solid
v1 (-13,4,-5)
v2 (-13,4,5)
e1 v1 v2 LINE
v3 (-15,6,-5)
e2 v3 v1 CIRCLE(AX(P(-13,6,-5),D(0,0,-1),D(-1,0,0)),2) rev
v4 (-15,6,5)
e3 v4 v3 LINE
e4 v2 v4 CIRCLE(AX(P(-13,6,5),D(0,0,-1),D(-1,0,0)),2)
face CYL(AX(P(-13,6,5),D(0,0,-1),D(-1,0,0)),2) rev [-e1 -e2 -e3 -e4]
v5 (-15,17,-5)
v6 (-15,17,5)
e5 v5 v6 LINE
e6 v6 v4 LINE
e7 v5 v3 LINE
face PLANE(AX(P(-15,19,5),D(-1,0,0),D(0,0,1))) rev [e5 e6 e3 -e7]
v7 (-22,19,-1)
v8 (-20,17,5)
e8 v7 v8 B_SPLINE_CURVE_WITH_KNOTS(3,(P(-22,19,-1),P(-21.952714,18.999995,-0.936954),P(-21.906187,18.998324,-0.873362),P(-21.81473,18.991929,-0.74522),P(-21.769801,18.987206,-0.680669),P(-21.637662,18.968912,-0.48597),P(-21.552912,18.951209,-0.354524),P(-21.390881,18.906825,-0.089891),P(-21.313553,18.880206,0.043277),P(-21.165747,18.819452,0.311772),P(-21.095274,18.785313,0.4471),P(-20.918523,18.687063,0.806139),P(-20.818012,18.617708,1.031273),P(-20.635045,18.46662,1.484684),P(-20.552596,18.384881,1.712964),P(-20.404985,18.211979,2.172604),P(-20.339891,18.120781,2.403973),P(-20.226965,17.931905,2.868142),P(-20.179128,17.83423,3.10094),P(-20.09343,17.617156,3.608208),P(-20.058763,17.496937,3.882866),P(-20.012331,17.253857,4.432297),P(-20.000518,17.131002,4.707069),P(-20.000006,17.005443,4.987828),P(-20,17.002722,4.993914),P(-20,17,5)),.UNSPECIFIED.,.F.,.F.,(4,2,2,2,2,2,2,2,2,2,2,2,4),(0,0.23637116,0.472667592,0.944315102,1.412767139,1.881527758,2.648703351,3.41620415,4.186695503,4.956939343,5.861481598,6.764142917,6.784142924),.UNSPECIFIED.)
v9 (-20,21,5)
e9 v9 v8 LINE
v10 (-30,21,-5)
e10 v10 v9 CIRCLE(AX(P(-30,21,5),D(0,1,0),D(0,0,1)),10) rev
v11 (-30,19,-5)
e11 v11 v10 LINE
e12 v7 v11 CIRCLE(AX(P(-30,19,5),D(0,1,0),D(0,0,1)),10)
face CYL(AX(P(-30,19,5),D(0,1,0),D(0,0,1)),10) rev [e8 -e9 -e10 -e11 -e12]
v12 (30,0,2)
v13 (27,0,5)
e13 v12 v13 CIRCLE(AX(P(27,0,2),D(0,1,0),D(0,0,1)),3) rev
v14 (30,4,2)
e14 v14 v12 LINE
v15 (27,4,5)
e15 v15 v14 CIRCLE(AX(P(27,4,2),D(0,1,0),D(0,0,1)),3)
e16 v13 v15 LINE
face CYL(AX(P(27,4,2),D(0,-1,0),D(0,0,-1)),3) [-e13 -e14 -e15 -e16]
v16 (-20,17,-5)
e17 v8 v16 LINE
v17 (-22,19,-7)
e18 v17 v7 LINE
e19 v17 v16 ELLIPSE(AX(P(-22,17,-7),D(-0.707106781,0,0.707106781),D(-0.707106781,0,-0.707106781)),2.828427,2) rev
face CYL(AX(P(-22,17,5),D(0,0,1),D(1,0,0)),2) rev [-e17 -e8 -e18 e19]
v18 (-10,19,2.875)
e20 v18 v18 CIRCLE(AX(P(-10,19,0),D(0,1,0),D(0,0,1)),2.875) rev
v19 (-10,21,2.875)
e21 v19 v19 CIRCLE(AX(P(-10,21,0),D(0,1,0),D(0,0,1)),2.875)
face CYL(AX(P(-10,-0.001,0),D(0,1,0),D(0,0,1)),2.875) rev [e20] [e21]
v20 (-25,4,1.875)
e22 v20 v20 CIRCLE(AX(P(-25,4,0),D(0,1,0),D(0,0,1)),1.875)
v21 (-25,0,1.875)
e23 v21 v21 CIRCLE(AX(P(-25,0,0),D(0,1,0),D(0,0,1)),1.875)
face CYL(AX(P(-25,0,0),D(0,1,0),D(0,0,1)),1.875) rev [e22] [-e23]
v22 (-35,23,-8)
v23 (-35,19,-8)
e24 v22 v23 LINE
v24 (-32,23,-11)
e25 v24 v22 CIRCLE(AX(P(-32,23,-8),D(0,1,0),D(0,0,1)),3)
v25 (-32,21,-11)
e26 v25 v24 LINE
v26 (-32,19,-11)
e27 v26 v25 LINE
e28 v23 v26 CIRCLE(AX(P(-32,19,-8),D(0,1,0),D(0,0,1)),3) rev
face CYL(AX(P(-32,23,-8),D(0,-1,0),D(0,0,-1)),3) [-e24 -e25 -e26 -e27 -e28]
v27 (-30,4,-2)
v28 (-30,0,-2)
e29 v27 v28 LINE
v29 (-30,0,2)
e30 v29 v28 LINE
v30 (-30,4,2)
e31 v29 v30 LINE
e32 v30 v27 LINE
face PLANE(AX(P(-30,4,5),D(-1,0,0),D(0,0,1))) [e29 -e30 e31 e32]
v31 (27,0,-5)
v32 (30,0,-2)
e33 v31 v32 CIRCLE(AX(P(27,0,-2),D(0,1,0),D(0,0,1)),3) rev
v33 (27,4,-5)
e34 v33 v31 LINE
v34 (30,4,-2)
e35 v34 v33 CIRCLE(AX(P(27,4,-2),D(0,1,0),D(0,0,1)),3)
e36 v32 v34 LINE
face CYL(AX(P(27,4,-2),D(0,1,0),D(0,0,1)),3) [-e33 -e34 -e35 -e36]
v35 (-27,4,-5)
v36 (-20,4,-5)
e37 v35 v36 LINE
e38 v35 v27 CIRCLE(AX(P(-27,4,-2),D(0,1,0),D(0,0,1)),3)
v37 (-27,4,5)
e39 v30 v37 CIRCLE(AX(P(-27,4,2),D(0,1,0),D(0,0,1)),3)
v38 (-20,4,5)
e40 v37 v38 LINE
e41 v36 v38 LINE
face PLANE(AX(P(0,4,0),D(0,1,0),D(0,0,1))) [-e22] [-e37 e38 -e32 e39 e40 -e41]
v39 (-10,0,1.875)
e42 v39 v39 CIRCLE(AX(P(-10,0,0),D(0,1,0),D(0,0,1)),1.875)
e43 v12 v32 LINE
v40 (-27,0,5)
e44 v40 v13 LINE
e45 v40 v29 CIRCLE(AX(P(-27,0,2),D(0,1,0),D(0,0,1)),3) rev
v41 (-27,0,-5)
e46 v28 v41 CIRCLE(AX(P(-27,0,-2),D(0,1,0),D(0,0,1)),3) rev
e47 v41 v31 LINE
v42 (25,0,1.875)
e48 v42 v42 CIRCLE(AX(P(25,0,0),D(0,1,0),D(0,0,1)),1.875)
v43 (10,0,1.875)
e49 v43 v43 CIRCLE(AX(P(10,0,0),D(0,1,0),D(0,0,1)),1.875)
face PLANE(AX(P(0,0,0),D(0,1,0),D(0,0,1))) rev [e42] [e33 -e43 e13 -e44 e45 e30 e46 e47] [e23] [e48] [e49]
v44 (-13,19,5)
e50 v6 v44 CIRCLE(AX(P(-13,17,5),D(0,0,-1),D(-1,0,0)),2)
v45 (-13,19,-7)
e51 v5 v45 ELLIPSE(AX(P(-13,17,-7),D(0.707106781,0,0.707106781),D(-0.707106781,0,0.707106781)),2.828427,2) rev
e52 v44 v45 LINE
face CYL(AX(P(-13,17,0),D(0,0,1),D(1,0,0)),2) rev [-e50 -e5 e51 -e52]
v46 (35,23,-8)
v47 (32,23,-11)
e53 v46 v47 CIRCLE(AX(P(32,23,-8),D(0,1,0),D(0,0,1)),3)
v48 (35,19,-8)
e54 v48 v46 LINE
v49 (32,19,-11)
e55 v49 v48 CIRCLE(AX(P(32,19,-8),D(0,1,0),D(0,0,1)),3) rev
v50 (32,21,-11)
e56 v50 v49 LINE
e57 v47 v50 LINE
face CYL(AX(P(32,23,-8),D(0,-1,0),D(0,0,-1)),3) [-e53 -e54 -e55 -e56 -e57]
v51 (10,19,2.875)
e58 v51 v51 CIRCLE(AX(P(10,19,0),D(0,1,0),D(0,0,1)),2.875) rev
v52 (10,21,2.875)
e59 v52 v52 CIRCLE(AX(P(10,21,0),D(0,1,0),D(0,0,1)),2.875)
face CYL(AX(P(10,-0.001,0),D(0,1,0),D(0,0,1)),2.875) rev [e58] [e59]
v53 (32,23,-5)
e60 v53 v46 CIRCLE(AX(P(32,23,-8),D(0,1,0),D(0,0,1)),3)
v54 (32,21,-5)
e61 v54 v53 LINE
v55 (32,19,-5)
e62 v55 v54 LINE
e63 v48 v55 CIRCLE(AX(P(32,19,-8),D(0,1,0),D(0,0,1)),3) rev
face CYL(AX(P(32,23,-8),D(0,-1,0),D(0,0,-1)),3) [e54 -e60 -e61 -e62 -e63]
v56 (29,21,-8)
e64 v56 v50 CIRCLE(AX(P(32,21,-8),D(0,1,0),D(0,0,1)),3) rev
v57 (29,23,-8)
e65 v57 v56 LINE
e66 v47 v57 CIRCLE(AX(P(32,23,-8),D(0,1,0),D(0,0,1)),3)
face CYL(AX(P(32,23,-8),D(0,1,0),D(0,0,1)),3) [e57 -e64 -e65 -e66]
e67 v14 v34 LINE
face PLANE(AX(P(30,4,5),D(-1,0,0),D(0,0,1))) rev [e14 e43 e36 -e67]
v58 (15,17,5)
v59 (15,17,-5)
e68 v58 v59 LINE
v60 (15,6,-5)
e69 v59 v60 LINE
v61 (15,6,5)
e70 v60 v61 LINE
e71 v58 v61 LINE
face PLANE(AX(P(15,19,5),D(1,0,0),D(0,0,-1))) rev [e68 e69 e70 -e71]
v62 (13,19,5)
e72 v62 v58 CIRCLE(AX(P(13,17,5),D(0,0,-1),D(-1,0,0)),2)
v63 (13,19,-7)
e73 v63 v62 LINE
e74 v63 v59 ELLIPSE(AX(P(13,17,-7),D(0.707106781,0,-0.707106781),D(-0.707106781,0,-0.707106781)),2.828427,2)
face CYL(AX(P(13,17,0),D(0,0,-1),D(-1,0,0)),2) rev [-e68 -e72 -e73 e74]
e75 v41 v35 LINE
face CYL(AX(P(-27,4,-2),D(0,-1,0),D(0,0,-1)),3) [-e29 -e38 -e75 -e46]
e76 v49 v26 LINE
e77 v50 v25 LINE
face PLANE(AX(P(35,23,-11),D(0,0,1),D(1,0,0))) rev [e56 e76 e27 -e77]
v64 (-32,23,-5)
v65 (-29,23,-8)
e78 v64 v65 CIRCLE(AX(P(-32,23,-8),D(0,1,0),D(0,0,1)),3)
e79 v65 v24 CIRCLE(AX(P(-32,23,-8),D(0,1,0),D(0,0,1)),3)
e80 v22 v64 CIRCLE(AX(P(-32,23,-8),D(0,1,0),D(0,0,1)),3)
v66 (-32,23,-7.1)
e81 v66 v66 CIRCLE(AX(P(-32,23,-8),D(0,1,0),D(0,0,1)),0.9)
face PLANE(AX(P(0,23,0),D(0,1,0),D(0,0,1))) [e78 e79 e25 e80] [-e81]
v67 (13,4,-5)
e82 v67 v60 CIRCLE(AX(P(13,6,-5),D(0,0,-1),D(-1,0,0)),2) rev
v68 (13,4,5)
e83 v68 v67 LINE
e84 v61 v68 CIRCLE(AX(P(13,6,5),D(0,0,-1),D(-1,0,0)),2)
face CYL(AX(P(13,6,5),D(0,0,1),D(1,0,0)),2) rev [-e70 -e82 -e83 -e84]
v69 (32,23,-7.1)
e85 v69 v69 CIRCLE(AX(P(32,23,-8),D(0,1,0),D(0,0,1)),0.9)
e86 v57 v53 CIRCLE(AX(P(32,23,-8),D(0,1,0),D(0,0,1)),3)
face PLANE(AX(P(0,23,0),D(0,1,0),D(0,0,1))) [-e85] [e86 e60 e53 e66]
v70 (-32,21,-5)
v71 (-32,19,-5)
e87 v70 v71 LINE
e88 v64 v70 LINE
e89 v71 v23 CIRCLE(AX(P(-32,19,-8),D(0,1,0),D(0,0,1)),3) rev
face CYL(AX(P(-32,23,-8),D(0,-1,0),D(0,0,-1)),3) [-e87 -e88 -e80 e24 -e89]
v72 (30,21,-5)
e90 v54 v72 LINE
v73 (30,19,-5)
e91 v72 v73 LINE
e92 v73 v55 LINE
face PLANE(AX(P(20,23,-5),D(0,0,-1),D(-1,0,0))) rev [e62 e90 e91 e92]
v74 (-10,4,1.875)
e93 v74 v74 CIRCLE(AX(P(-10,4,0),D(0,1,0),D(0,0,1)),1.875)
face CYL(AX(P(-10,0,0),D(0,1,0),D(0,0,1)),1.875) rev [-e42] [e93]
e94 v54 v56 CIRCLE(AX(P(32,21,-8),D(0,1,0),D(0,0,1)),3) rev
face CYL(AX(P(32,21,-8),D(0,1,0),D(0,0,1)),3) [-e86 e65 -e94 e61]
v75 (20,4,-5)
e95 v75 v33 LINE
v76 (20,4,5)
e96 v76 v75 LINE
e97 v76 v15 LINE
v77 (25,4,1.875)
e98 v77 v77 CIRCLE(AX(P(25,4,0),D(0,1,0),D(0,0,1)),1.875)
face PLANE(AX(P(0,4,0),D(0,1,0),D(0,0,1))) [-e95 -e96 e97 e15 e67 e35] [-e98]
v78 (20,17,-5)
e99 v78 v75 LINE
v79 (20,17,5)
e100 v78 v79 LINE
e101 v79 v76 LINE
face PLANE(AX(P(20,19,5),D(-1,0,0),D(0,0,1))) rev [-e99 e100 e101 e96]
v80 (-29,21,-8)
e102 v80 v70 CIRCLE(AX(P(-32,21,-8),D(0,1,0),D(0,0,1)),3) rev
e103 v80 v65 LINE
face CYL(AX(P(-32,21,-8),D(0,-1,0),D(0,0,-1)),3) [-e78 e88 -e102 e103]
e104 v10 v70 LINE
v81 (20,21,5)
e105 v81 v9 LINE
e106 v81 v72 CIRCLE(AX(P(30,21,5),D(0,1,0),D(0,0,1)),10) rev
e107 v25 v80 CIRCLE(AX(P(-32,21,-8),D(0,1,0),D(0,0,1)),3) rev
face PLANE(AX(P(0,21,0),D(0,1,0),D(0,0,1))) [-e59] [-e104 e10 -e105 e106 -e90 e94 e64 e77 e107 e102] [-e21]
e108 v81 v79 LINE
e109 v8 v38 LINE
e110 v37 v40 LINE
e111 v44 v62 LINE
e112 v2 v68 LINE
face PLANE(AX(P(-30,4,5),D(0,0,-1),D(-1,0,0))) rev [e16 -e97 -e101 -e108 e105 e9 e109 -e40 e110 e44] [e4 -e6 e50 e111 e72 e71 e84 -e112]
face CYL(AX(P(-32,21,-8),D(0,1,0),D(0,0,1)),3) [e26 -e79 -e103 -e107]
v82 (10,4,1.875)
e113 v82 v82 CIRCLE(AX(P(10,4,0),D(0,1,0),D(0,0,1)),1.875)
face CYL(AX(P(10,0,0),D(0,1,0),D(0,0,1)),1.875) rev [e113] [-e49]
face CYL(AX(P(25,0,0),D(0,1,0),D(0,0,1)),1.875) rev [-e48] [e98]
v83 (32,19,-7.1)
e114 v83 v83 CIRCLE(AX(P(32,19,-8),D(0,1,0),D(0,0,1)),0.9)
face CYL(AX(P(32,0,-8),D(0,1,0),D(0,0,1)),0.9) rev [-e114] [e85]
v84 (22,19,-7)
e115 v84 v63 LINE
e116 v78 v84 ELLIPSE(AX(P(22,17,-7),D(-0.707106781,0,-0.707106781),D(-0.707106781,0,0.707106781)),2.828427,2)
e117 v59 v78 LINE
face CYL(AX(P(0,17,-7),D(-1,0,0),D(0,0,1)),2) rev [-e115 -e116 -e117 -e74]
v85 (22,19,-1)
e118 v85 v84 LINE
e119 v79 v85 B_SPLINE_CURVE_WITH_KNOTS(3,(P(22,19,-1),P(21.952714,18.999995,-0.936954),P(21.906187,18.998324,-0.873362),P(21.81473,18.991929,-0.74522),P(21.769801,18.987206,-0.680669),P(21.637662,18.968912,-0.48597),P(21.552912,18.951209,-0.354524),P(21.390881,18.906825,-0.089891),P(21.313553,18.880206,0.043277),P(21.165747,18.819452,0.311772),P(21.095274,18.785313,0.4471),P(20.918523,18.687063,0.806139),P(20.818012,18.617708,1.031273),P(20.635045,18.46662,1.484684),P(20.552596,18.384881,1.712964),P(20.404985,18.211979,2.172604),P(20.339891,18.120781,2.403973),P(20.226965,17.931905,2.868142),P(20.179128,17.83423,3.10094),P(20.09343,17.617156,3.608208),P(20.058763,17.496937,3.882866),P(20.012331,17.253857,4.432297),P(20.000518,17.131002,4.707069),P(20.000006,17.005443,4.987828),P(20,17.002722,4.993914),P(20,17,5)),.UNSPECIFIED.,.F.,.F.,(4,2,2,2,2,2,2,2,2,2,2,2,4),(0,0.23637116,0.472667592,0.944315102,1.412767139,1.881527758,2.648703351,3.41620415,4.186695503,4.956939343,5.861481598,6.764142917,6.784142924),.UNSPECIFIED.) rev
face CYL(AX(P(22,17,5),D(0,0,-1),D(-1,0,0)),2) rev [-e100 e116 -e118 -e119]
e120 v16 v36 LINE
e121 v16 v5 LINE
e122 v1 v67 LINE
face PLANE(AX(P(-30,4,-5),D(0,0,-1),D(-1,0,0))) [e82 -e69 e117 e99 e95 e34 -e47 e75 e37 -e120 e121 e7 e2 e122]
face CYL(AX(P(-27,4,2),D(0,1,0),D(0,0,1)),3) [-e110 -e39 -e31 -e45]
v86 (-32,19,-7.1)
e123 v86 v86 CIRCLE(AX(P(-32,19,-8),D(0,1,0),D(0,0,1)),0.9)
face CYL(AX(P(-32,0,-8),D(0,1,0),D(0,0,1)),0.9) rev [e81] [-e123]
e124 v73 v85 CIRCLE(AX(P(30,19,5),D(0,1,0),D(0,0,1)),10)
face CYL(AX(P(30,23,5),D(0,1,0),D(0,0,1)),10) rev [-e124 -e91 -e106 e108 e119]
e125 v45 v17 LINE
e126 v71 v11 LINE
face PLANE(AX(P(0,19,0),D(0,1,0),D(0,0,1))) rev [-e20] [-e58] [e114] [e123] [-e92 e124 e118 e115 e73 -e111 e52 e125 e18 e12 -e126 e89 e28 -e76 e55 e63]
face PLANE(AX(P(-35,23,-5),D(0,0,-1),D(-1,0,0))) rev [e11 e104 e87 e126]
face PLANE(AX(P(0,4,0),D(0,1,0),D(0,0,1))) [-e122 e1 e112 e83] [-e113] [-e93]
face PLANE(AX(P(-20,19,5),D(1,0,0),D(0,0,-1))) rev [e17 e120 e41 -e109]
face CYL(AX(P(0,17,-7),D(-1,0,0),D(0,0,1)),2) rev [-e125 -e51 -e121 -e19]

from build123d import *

# Parameters (mm, degrees)
SKETCH1_W           = 60
SKETCH1_H           = 10
BOSS_EXTRUDE1_DEPTH = 4
SKETCH2_R           = 1.875
CUT_EXTRUDE1_DEPTH  = 31.6757233
SKETCH4_W           = 5
SKETCH4_H           = 10
BOSS_EXTRUDE2_DEPTH = 15
BOSS_EXTRUDE3_DEPTH = 4
SKETCH7_W           = 58
SKETCH7_H           = 6
CUT_EXTRUDE2_DEPTH  = 2
SKETCH9_W           = 40
SKETCH9_H           = 10
CUT_EXTRUDE3_DEPTH  = 2
CUT_EXTRUDE5_REACH  = 44.273
SKETCH10_R          = 2.875
FILLET1_R           = 10
FILLET2_R           = 3
FILLET3_R           = 2
SKETCH8_R           = 0.9
CUT_EXTRUDE4_DEPTH  = 44.301270189
FILLET4_R           = 2


# Some blends are built 0.0001 mm under size
with BuildPart() as part:
    # Sketch1 → Boss-Extrude1 (new body)
    with BuildSketch(Plane(origin=(0, 0, 0), x_dir=(1, 0, 0), z_dir=(0, 1, 0))):
        Rectangle(SKETCH1_W, SKETCH1_H)
    extrude(amount=BOSS_EXTRUDE1_DEPTH)

    # Sketch2 → Cut-Extrude1 (cut, through all)
    with BuildSketch(Plane(origin=(0, 4, 0), x_dir=(1, 0, 0), z_dir=(0, 1, 0))):
        with Locations(Location((-25, 0, 0), (0, 0, 270))):
            Circle(SKETCH2_R)
        with Locations(Location((-10, 0, 0), (0, 0, 270))):
            Circle(SKETCH2_R)
        with Locations(Location((10, 0, 0), (0, 0, 270))):
            Circle(SKETCH2_R)
        with Locations(Location((25, 0, 0), (0, 0, 270))):
            Circle(SKETCH2_R)
    extrude(amount=-CUT_EXTRUDE1_DEPTH, mode=Mode.SUBTRACT)

    # Sketch4 → Boss-Extrude2 (add)
    with BuildSketch(Plane(origin=(0, 4, 0), x_dir=(1, 0, 0), z_dir=(0, 1, 0))):
        with Locations((-17.5, 0)):
            Rectangle(SKETCH4_W, SKETCH4_H)
        with Locations((17.5, 0)):
            Rectangle(SKETCH4_W, SKETCH4_H)
    extrude(amount=BOSS_EXTRUDE2_DEPTH)

    # Sketch5 → Boss-Extrude3 (add)
    with BuildSketch(Plane(origin=(0, 19, 0), x_dir=(1, 0, 0), z_dir=(0, 1, 0))):
        Polygon((-20, -5), (20, -5), (20, 5), (35, 5), (35, 11), (-35, 11), (-35, 5), (-20, 5), align=None)
    extrude(amount=BOSS_EXTRUDE3_DEPTH)

    # Sketch7 → Cut-Extrude2 (cut)
    with BuildSketch(Plane(origin=(0, 23, 0), x_dir=(1, 0, 0), z_dir=(0, 1, 0))):
        with Locations((0, 8)):
            Rectangle(SKETCH7_W, SKETCH7_H)
    extrude(amount=-CUT_EXTRUDE2_DEPTH, mode=Mode.SUBTRACT)

    # Sketch9 → Cut-Extrude3 (cut)
    with BuildSketch(Plane(origin=(0, 23, 0), x_dir=(1, 0, 0), z_dir=(0, 1, 0))):
        Rectangle(SKETCH9_W, SKETCH9_H)
    extrude(amount=-CUT_EXTRUDE3_DEPTH, mode=Mode.SUBTRACT)

    # Sketch10 → Cut-Extrude5 (cut, up to next)
    with BuildSketch(Plane(origin=(0, 21, 0), x_dir=(1, 0, 0), z_dir=(0, 1, 0)), mode=Mode.PRIVATE) as cut_extrude5_sk1:
        with Locations(Location((-10, 0, 0), (0, 0, 270))):
            Circle(SKETCH10_R)
    cut_extrude5_tool1 = extrude(cut_extrude5_sk1.sketch, amount=-CUT_EXTRUDE5_REACH, mode=Mode.PRIVATE) & part.part
    # Sketch10 → Cut-Extrude5 (cut, up to next)
    with BuildSketch(Plane(origin=(0, 21, 0), x_dir=(1, 0, 0), z_dir=(0, 1, 0)), mode=Mode.PRIVATE) as cut_extrude5_sk2:
        with Locations(Location((10, 0, 0), (0, 0, 270))):
            Circle(SKETCH10_R)
    cut_extrude5_tool2 = extrude(cut_extrude5_sk2.sketch, amount=-CUT_EXTRUDE5_REACH, mode=Mode.PRIVATE) & part.part
    add(cut_extrude5_tool1.solids().sort_by_distance((-10, 21, 0))[0], mode=Mode.SUBTRACT)
    add(cut_extrude5_tool2.solids().sort_by_distance((10, 21, 0))[0], mode=Mode.SUBTRACT)

    # Fillet1
    fillet1_edges = [part.edges().sort_by_distance(p)[0] for p in [
        (20, 20, -5),
        (-20, 20, -5),
    ]]
    fillet(fillet1_edges, radius=FILLET1_R - 0.0001)  # a hair under: the kernel refuses the full size

    # Fillet2
    # the kernel refuses this fillet: 3 mm, written as the material it takes off along each edge
    with BuildSketch(Plane(origin=(30, -7.5, -5), x_dir=(-1, 0, 0), z_dir=(0, 1, 0)), Plane(origin=(-30, -7.5, 5), x_dir=(1, 0, 0), z_dir=(0, 1, 0)), Plane(origin=(-35, 11.5, -5), x_dir=(1, 0, 0), z_dir=(0, 1, 0)), Plane(origin=(35, 11.5, -11), x_dir=(-1, 0, 0), z_dir=(0, 1, 0))) as fillet2_piece_1:
        with BuildLine():
            CenterArc((FILLET2_R, FILLET2_R), FILLET2_R, 180, 90)
            Line((0, FILLET2_R), (0, 0))
            Line((0, 0), (FILLET2_R, 0))
        make_face()
    fillet2_piece_1_solid = extrude(amount=19, mode=Mode.PRIVATE)
    with BuildSketch(Plane(origin=(30, -7.5, 5), x_dir=(-1, 0, 0), z_dir=(0, 1, 0)), Plane(origin=(-30, -7.5, -5), x_dir=(1, 0, 0), z_dir=(0, 1, 0)), Plane(origin=(-35, 11.5, -11), x_dir=(1, 0, 0), z_dir=(0, 1, 0)), Plane(origin=(35, 11.5, -5), x_dir=(-1, 0, 0), z_dir=(0, 1, 0))) as fillet2_piece_2:
        with BuildLine():
            CenterArc((FILLET2_R, -FILLET2_R), FILLET2_R, 90, 90)
            Line((0, -FILLET2_R), (0, 0))
            Line((0, 0), (FILLET2_R, 0))
        make_face()
    fillet2_piece_2_solid = extrude(amount=19, mode=Mode.PRIVATE)
    with BuildSketch(Plane(origin=(-29, 30.5, -11), x_dir=(0, 0, 1), z_dir=(0, -1, 0)), Plane(origin=(29, 30.5, -11), x_dir=(1, 0, 0), z_dir=(0, -1, 0))) as fillet2_piece_3:
        with BuildLine():
            CenterArc((FILLET2_R, FILLET2_R), FILLET2_R, 180, 90)
            Line((0, FILLET2_R), (0, 0))
            Line((0, 0), (FILLET2_R, 0))
        make_face()
    fillet2_piece_3_solid = extrude(amount=9.5, mode=Mode.PRIVATE)
    with BuildSketch(Plane(origin=(-29, 21, -4.949883917), x_dir=(-0.9998604946563736, 0, -0.016703030428994153), z_dir=(0, 1, 0))) as fillet2_piece_4:
        with BuildLine():
            CenterArc((3.050527666, -2.999581484), FILLET2_R, 90.957057654, 90)
            Line((0.050946182, -3.049690575), (-0.249011967, -3.054701484))
            Line((-0.249011967, -3.054701484), (-0.299958148, -0.005010909))
            Line((-0.299958148, -0.005010909), (0.025007319, 0.298955906))
            ThreePointArc((0.025007319, 0.298955906), (0.99558669, 0.266550417), (2.995407665, 0.299958148))
            Line((2.995407665, 0.299958148), (3.000418574, 0))
        make_face()
    fillet2_piece_4_solid = extrude(amount=9.625290207, mode=Mode.PRIVATE)
    with BuildSketch(Plane(origin=(29, 21, -4.949883917), x_dir=(0.9998604946563736, 0, -0.01670303042899439), z_dir=(0, 1, 0))) as fillet2_piece_5:
        with BuildLine():
            CenterArc((3.050527666, 2.999581484), FILLET2_R, 179.042942346, 90)
            Line((0.050946182, 3.049690575), (-0.249011967, 3.054701484))
            Line((-0.249011967, 3.054701484), (-0.299958148, 0.005010909))
            Line((-0.299958148, 0.005010909), (0.025007319, -0.298955906))
            ThreePointArc((0.025007319, -0.298955906), (0.99558669, -0.266550417), (2.995407665, -0.299958148))
            Line((2.995407665, -0.299958148), (3.000418574, 0))
        make_face()
    fillet2_piece_5_solid = extrude(amount=9.625290207, mode=Mode.PRIVATE)
    add([fillet2_piece_1_solid, fillet2_piece_2_solid, fillet2_piece_3_solid, fillet2_piece_4_solid, fillet2_piece_5_solid], mode=Mode.SUBTRACT)

    # Fillet3
    fillet3_edges = [part.edges().sort_by_distance(p)[0] for p in [
        (-15, 4, 0),
        (-15, 19, 0),
        (15, 4, 0),
        (15, 19, 0),
    ]]
    fillet(fillet3_edges, radius=FILLET3_R)

    # Sketch8 → Cut-Extrude4 (cut, through all)
    with BuildSketch(Plane(origin=(0, 23, 0), x_dir=(1, 0, 0), z_dir=(0, 1, 0))):
        with Locations(Location((32, 8, 0), (0, 0, 270))):
            Circle(SKETCH8_R)
        with Locations(Location((-32, 8, 0), (0, 0, 270))):
            Circle(SKETCH8_R)
    extrude(amount=-CUT_EXTRUDE4_DEPTH, mode=Mode.SUBTRACT)

    # Fillet4
    fillet4_edges = [part.edges().sort_by_distance(p)[0] for p in [
        (-16.5, 19, -5),
        (16.5, 19, -5),
        (-20, 19, -5e-05),
        (20, 19, -5e-05),
    ]]
    fillet(fillet4_edges, radius=FILLET4_R - 0.0001)  # a hair under: the kernel refuses the full size


solid = part.part
